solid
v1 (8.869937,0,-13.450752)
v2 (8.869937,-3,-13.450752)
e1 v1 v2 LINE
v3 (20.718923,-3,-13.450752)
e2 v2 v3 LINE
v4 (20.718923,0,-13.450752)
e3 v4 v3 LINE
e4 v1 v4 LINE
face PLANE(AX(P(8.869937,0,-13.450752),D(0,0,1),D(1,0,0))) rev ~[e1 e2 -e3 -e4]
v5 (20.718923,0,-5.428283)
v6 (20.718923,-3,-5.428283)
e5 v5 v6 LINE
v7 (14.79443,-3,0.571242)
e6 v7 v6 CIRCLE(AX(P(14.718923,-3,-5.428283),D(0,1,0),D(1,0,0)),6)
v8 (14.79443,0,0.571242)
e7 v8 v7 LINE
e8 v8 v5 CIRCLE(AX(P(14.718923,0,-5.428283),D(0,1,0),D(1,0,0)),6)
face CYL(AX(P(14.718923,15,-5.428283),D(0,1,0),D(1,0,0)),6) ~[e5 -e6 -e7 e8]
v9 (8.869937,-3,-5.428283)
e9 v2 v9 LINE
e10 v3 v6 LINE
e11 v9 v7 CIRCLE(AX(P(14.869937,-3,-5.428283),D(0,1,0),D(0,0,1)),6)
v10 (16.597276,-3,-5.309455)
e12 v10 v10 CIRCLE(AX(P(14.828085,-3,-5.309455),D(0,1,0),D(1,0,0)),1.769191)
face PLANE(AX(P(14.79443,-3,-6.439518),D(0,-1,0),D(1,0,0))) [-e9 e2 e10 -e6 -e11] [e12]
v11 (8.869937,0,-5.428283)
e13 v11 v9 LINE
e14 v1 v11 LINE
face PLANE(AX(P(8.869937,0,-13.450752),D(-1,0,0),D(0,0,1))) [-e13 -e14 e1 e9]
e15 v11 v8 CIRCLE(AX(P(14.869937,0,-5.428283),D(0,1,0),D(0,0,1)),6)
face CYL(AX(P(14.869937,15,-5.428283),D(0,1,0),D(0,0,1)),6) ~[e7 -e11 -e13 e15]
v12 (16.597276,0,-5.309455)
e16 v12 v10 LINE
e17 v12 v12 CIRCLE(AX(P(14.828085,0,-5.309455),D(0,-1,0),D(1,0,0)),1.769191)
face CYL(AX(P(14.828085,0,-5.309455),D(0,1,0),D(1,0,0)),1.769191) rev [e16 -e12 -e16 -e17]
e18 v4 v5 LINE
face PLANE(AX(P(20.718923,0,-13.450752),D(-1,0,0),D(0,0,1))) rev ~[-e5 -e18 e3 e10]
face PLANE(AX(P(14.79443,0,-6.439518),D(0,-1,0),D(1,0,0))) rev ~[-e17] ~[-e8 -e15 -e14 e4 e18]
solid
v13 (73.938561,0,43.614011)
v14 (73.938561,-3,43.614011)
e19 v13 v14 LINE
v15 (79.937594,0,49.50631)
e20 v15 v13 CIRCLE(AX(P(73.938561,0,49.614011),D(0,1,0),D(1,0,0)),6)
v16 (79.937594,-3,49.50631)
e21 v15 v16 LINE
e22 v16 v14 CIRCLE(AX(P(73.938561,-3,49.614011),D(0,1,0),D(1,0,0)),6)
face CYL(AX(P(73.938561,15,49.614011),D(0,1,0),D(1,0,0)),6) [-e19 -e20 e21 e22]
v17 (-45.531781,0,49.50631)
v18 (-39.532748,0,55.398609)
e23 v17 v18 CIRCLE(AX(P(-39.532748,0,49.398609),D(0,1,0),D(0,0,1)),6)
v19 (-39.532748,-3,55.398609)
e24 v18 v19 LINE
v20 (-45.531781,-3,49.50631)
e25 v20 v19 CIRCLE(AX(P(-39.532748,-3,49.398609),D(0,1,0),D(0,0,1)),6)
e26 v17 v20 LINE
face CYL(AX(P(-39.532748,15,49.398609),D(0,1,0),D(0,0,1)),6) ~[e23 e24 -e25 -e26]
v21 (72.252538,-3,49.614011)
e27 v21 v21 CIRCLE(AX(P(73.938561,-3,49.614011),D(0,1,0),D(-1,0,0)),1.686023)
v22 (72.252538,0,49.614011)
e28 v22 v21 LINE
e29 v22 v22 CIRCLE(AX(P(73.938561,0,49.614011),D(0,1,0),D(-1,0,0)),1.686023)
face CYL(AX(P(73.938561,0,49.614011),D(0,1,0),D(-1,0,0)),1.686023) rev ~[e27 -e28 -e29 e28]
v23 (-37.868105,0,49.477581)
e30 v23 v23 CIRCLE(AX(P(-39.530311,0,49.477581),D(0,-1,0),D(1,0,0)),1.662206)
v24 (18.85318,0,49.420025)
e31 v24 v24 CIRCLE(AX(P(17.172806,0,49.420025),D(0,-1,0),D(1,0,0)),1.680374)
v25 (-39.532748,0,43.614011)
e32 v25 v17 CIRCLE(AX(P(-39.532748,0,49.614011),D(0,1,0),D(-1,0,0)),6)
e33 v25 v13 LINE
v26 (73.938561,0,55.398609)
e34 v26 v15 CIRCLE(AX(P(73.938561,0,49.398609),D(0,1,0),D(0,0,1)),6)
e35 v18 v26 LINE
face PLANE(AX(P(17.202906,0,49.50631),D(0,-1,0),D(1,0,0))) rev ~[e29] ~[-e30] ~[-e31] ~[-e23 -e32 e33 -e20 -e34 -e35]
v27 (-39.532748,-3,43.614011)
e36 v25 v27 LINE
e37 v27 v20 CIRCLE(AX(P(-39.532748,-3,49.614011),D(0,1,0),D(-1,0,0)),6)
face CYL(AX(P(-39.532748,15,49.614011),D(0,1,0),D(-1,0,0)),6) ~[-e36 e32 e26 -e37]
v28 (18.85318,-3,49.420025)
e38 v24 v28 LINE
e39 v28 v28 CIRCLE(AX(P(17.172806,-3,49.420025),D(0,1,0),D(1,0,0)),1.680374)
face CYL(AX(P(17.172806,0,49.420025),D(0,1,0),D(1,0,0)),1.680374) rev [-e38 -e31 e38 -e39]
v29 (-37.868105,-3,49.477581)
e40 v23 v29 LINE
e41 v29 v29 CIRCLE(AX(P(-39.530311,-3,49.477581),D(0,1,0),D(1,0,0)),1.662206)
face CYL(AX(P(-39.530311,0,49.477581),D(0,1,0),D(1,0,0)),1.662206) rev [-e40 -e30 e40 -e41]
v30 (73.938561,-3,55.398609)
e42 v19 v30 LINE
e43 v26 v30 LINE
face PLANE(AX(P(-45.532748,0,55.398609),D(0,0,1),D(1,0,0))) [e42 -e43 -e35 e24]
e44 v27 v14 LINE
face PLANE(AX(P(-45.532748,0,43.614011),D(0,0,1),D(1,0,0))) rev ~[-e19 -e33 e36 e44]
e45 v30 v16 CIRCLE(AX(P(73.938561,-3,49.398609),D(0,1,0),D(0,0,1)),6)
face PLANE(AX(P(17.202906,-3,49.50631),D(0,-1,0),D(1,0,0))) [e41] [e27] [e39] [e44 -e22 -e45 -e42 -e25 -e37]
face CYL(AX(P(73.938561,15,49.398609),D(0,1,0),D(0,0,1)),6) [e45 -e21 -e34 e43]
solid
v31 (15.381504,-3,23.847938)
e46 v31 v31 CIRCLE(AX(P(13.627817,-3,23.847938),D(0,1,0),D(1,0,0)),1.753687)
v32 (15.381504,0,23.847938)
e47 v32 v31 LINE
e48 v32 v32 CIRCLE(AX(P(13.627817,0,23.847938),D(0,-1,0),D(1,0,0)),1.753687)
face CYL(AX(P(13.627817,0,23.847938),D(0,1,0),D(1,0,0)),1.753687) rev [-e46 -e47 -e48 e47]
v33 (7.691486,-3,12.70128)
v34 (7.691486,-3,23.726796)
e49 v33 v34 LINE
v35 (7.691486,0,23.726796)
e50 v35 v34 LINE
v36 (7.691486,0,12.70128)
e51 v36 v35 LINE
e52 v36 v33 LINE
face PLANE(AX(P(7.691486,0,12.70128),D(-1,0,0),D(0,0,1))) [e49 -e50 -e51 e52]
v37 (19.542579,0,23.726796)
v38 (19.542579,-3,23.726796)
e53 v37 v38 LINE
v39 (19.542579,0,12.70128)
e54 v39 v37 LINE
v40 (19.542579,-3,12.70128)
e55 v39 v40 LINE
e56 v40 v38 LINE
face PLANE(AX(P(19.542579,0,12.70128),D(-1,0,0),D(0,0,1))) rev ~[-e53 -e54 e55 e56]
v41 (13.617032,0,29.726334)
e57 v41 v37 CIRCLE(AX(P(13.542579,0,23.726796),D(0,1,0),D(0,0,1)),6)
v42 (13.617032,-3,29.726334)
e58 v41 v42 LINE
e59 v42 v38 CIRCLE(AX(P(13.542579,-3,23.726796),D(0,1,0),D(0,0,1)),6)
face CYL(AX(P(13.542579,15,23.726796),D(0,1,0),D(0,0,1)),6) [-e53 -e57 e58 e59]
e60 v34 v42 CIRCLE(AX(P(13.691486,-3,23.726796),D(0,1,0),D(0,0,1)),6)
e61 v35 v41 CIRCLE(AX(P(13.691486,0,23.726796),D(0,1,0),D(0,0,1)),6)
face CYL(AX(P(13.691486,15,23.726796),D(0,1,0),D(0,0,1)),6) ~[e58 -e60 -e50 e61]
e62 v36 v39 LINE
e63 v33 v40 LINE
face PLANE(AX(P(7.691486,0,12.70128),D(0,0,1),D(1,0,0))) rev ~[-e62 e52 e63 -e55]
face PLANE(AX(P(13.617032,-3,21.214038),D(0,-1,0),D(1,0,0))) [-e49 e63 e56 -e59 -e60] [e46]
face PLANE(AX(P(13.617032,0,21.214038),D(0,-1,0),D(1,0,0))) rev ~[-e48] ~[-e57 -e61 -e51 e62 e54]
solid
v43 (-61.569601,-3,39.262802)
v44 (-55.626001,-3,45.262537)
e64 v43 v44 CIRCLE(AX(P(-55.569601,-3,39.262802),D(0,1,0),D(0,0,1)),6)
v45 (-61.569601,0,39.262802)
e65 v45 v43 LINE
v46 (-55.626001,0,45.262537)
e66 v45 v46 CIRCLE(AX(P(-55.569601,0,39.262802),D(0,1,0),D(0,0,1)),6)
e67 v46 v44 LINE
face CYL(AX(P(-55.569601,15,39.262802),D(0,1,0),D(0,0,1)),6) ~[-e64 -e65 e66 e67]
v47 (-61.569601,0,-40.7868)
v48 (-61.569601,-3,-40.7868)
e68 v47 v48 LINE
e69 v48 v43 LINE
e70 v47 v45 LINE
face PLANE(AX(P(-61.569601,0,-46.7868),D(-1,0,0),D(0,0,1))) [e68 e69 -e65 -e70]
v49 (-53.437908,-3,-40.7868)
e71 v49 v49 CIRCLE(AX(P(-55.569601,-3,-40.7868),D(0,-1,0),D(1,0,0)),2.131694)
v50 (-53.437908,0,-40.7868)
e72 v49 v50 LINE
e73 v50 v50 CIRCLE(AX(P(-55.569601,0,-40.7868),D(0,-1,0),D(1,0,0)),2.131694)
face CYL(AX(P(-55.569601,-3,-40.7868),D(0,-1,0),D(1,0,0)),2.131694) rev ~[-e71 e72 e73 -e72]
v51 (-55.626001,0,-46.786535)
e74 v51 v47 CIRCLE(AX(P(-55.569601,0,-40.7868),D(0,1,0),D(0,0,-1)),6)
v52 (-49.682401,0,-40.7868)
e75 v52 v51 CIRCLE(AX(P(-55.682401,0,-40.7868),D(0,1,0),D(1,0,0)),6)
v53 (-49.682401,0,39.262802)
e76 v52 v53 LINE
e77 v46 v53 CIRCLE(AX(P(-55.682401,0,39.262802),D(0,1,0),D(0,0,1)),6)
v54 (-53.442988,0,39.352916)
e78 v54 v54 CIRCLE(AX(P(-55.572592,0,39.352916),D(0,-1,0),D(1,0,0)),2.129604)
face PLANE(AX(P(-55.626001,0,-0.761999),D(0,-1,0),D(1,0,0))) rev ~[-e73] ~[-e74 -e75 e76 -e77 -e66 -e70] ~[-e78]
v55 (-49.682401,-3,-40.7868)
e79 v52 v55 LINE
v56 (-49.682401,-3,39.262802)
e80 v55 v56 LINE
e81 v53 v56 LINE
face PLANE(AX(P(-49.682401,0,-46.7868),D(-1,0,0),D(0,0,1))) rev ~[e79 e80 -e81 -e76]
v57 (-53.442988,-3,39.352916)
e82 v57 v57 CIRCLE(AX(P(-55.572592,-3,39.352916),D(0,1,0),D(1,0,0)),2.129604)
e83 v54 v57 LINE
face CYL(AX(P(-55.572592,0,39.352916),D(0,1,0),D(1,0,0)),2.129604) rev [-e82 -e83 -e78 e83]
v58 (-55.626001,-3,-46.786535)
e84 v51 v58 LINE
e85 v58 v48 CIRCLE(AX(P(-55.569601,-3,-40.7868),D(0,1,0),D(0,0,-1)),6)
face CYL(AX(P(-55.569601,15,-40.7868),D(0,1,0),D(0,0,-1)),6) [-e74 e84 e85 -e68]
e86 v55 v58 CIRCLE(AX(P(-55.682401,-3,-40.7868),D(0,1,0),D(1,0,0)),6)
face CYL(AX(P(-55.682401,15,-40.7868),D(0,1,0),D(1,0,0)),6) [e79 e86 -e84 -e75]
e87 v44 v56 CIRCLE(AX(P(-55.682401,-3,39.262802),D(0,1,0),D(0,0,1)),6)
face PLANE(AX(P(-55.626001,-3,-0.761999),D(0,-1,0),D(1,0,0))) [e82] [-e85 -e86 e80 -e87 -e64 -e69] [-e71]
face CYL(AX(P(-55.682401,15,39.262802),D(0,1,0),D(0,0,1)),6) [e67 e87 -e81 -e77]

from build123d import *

# Parameters (mm, degrees)
F0_W         = 11.8872001767
F0_H         = 92.0496024191
F1_DEPTH     = 3
F2_T1_DEPTH  = 33
F3_T1_DEPTH  = 33
F4_R         = 2.1296037298
F5_DEPTH     = 25
F6_R         = 2.1316935328
F7_DEPTH     = 11.5
F8_W         = 125.4713088274
F8_H         = 11.7845982313
F9_DEPTH     = 3
F10_T1_DEPTH = 33
F11_T1_DEPTH = 33
F12_R        = 1.6622062421
F13_DEPTH    = 48.8
F14_R        = 1.68602316
F15_DEPTH    = 13.8
F16_R        = 1.68037386
F17_DEPTH    = 14.7
F18_W        = 11.8510928005
F18_H        = 17.0255154371
F19_DEPTH    = 3
F20_T1_DEPTH = 33
F21_R        = 1.75368676
F22_DEPTH    = 6.9
F23_W        = 11.8489861488
F23_H        = 14.0224687639
F24_DEPTH    = 3
F25_T1_DEPTH = 33
F26_R        = 1.7691912445
F27_DEPTH    = 16.9


# Not quite as in the source:
# - a fillet or chamfer that OpenCascade refuses, or shapes differently, is made with other operations: its cross-section is extruded or revolved along the edge and cut away or added


with BuildPart() as f1:
    # F0 (on Front) → F1 (new body)
    with BuildSketch(Plane.XZ):
        with Locations((-55.626001209, -0.7619988173)):
            Rectangle(F0_W, F0_H)
    extrude(amount=F1_DEPTH)

    # F2: fillet of radius 6 on 2 edges, made by hand

    # F2_s2 → F2_t1 (cut)
    with BuildSketch(Plane.XZ.offset(-15)):
        with BuildLine():
            ThreePointArc((-55.5696012974, 45.2628023922), (-59.8122419845, 43.5054430794), (-61.5696012974, 39.2628023922))
            Line((-61.5696012974, 39.2628023922), (-61.5696012974, 45.2628023922))
            Line((-61.5696012974, 45.2628023922), (-55.5696012974, 45.2628023922))
        make_face()
        with BuildLine():
            ThreePointArc((-55.6824011207, 45.2628023922), (-51.4397604335, 43.5054430794), (-49.6824011207, 39.2628023922))
            Line((-49.6824011207, 39.2628023922), (-49.6824011207, 45.2628023922))
            Line((-49.6824011207, 45.2628023922), (-55.6824011207, 45.2628023922))
        make_face()
    extrude(amount=F2_T1_DEPTH, mode=Mode.SUBTRACT)

    # F3: fillet of radius 6 on 2 edges, made by hand

    # F3_s2 → F3_t1 (cut)
    with BuildSketch(Plane.XZ.offset(-15)):
        with BuildLine():
            ThreePointArc((-49.6824011207, -40.7868000269), (-51.4397604335, -45.029440714), (-55.6824011207, -46.7868000269))
            Line((-55.6824011207, -46.7868000269), (-49.6824011207, -46.7868000269))
            Line((-49.6824011207, -46.7868000269), (-49.6824011207, -40.7868000269))
        make_face()
        with BuildLine():
            ThreePointArc((-55.5696012974, -46.7868000269), (-59.8122419845, -45.029440714), (-61.5696012974, -40.7868000269))
            Line((-61.5696012974, -40.7868000269), (-61.5696012974, -46.7868000269))
            Line((-61.5696012974, -46.7868000269), (-55.5696012974, -46.7868000269))
        make_face()
    extrude(amount=F3_T1_DEPTH, mode=Mode.SUBTRACT)

    # F4 (on Front) → F5 (cut)
    with BuildSketch(Plane.XZ):
        with Locations((-55.572591722, 39.3529161811)):
            Circle(F4_R)
    extrude(amount=F5_DEPTH, mode=Mode.SUBTRACT)

    # F6 (on face) → F7 (cut)
    with BuildSketch(Plane.XZ.offset(3)):
        with Locations((-55.5696012974, -40.7868000269)):
            Circle(F6_R)
    extrude(amount=-F7_DEPTH, mode=Mode.SUBTRACT)


with BuildPart() as f9:
    # F8 (on Front) → F9 (new body)
    with BuildSketch(Plane.XZ):
        with Locations((17.2029063106, 49.5063103735)):
            Rectangle(F8_W, F8_H)
    extrude(amount=F9_DEPTH)

    # F10: fillet of radius 6 on 2 edges, made by hand

    # F10_s2 → F10_t1 (cut)
    with BuildSketch(Plane.XZ.offset(-15)):
        with BuildLine():
            ThreePointArc((-39.5327481031, 55.3986094892), (-43.7753887903, 53.6412501763), (-45.5327481031, 49.3986094892))
            Line((-45.5327481031, 49.3986094892), (-45.5327481031, 55.3986094892))
            Line((-45.5327481031, 55.3986094892), (-39.5327481031, 55.3986094892))
        make_face()
        with BuildLine():
            ThreePointArc((-45.5327481031, 49.6140112579), (-43.7753887903, 45.3713705708), (-39.5327481031, 43.6140112579))
            Line((-39.5327481031, 43.6140112579), (-45.5327481031, 43.6140112579))
            Line((-45.5327481031, 43.6140112579), (-45.5327481031, 49.6140112579))
        make_face()
    extrude(amount=F10_T1_DEPTH, mode=Mode.SUBTRACT)

    # F11: fillet of radius 6 on 2 edges, made by hand

    # F11_s2 → F11_t1 (cut)
    with BuildSketch(Plane.XZ.offset(-15)):
        with BuildLine():
            ThreePointArc((73.9385607243, 55.3986094892), (78.1812014114, 53.6412501763), (79.9385607243, 49.3986094892))
            Line((79.9385607243, 49.3986094892), (79.9385607243, 55.3986094892))
            Line((79.9385607243, 55.3986094892), (73.9385607243, 55.3986094892))
        make_face()
        with BuildLine():
            ThreePointArc((79.9385607243, 49.6140112579), (78.1812014114, 45.3713705708), (73.9385607243, 43.6140112579))
            Line((73.9385607243, 43.6140112579), (79.9385607243, 43.6140112579))
            Line((79.9385607243, 43.6140112579), (79.9385607243, 49.6140112579))
        make_face()
    extrude(amount=F11_T1_DEPTH, mode=Mode.SUBTRACT)

    # F12 (on Front) → F13 (cut)
    with BuildSketch(Plane.XZ):
        with Locations((-39.5303107798, 49.4775809348)):
            Circle(F12_R)
    extrude(amount=F13_DEPTH, mode=Mode.SUBTRACT)

    # F14 (on face) → F15 (cut)
    with BuildSketch(Plane(origin=(0, 0, 0), x_dir=(-1, 0, 0), z_dir=(0, 1, 0))):
        with Locations((-73.9385607243, 49.6140112579)):
            Circle(F14_R)
    extrude(amount=-F15_DEPTH, mode=Mode.SUBTRACT)

    # F16 (on Front) → F17 (cut)
    with BuildSketch(Plane.XZ):
        with Locations((17.1728059649, 49.4200251997)):
            Circle(F16_R)
    extrude(amount=F17_DEPTH, mode=Mode.SUBTRACT)


with BuildPart() as f19:
    # F18 (on Front) → F19 (new body)
    with BuildSketch(Plane.XZ):
        with Locations((13.6170322075, 21.2140381336)):
            Rectangle(F18_W, F18_H)
    extrude(amount=F19_DEPTH)

    # F20: fillet of radius 6 on 2 edges, made by hand

    # F20_s2 → F20_t1 (cut)
    with BuildSketch(Plane.XZ.offset(-15)):
        with BuildLine():
            ThreePointArc((13.5425786078, 29.7267958522), (17.7852192949, 27.9694365393), (19.5425786078, 23.7267958522))
            Line((19.5425786078, 23.7267958522), (19.5425786078, 29.7267958522))
            Line((19.5425786078, 29.7267958522), (13.5425786078, 29.7267958522))
        make_face()
        with BuildLine():
            ThreePointArc((13.6914858073, 29.7267958522), (9.4488451202, 27.9694365393), (7.6914858073, 23.7267958522))
            Line((7.6914858073, 23.7267958522), (7.6914858073, 29.7267958522))
            Line((7.6914858073, 29.7267958522), (13.6914858073, 29.7267958522))
        make_face()
    extrude(amount=F20_T1_DEPTH, mode=Mode.SUBTRACT)

    # F21 (on Front) → F22 (cut)
    with BuildSketch(Plane.XZ):
        with Locations((13.627816923, 23.8479375839)):
            Circle(F21_R)
    extrude(amount=F22_DEPTH, mode=Mode.SUBTRACT)


with BuildPart() as f24:
    # F23 (on Front) → F24 (new body)
    with BuildSketch(Plane.XZ):
        with Locations((14.7944297642, -6.4395176305)):
            Rectangle(F23_W, F23_H)
    extrude(amount=F24_DEPTH)

    # F25: fillet of radius 6 on 2 edges, made by hand

    # F25_s2 → F25_t1 (cut)
    with BuildSketch(Plane.XZ.offset(-15)):
        with BuildLine():
            ThreePointArc((14.8699366897, 0.5717167514), (10.6272960026, -1.1856425614), (8.8699366897, -5.4282832486))
            Line((8.8699366897, -5.4282832486), (8.8699366897, 0.5717167514))
            Line((8.8699366897, 0.5717167514), (14.8699366897, 0.5717167514))
        make_face()
        with BuildLine():
            ThreePointArc((20.7189228386, -5.4282832486), (18.9615635257, -1.1856425614), (14.7189228386, 0.5717167514))
            Line((14.7189228386, 0.5717167514), (20.7189228386, 0.5717167514))
            Line((20.7189228386, 0.5717167514), (20.7189228386, -5.4282832486))
        make_face()
    extrude(amount=F25_T1_DEPTH, mode=Mode.SUBTRACT)

    # F26 (on Front) → F27 (cut)
    with BuildSketch(Plane.XZ):
        with Locations((14.828084968, -5.3094546311)):
            Circle(F26_R)
    extrude(amount=F27_DEPTH, mode=Mode.SUBTRACT)


solid = Compound([f1.part, f9.part, f19.part, f24.part])
